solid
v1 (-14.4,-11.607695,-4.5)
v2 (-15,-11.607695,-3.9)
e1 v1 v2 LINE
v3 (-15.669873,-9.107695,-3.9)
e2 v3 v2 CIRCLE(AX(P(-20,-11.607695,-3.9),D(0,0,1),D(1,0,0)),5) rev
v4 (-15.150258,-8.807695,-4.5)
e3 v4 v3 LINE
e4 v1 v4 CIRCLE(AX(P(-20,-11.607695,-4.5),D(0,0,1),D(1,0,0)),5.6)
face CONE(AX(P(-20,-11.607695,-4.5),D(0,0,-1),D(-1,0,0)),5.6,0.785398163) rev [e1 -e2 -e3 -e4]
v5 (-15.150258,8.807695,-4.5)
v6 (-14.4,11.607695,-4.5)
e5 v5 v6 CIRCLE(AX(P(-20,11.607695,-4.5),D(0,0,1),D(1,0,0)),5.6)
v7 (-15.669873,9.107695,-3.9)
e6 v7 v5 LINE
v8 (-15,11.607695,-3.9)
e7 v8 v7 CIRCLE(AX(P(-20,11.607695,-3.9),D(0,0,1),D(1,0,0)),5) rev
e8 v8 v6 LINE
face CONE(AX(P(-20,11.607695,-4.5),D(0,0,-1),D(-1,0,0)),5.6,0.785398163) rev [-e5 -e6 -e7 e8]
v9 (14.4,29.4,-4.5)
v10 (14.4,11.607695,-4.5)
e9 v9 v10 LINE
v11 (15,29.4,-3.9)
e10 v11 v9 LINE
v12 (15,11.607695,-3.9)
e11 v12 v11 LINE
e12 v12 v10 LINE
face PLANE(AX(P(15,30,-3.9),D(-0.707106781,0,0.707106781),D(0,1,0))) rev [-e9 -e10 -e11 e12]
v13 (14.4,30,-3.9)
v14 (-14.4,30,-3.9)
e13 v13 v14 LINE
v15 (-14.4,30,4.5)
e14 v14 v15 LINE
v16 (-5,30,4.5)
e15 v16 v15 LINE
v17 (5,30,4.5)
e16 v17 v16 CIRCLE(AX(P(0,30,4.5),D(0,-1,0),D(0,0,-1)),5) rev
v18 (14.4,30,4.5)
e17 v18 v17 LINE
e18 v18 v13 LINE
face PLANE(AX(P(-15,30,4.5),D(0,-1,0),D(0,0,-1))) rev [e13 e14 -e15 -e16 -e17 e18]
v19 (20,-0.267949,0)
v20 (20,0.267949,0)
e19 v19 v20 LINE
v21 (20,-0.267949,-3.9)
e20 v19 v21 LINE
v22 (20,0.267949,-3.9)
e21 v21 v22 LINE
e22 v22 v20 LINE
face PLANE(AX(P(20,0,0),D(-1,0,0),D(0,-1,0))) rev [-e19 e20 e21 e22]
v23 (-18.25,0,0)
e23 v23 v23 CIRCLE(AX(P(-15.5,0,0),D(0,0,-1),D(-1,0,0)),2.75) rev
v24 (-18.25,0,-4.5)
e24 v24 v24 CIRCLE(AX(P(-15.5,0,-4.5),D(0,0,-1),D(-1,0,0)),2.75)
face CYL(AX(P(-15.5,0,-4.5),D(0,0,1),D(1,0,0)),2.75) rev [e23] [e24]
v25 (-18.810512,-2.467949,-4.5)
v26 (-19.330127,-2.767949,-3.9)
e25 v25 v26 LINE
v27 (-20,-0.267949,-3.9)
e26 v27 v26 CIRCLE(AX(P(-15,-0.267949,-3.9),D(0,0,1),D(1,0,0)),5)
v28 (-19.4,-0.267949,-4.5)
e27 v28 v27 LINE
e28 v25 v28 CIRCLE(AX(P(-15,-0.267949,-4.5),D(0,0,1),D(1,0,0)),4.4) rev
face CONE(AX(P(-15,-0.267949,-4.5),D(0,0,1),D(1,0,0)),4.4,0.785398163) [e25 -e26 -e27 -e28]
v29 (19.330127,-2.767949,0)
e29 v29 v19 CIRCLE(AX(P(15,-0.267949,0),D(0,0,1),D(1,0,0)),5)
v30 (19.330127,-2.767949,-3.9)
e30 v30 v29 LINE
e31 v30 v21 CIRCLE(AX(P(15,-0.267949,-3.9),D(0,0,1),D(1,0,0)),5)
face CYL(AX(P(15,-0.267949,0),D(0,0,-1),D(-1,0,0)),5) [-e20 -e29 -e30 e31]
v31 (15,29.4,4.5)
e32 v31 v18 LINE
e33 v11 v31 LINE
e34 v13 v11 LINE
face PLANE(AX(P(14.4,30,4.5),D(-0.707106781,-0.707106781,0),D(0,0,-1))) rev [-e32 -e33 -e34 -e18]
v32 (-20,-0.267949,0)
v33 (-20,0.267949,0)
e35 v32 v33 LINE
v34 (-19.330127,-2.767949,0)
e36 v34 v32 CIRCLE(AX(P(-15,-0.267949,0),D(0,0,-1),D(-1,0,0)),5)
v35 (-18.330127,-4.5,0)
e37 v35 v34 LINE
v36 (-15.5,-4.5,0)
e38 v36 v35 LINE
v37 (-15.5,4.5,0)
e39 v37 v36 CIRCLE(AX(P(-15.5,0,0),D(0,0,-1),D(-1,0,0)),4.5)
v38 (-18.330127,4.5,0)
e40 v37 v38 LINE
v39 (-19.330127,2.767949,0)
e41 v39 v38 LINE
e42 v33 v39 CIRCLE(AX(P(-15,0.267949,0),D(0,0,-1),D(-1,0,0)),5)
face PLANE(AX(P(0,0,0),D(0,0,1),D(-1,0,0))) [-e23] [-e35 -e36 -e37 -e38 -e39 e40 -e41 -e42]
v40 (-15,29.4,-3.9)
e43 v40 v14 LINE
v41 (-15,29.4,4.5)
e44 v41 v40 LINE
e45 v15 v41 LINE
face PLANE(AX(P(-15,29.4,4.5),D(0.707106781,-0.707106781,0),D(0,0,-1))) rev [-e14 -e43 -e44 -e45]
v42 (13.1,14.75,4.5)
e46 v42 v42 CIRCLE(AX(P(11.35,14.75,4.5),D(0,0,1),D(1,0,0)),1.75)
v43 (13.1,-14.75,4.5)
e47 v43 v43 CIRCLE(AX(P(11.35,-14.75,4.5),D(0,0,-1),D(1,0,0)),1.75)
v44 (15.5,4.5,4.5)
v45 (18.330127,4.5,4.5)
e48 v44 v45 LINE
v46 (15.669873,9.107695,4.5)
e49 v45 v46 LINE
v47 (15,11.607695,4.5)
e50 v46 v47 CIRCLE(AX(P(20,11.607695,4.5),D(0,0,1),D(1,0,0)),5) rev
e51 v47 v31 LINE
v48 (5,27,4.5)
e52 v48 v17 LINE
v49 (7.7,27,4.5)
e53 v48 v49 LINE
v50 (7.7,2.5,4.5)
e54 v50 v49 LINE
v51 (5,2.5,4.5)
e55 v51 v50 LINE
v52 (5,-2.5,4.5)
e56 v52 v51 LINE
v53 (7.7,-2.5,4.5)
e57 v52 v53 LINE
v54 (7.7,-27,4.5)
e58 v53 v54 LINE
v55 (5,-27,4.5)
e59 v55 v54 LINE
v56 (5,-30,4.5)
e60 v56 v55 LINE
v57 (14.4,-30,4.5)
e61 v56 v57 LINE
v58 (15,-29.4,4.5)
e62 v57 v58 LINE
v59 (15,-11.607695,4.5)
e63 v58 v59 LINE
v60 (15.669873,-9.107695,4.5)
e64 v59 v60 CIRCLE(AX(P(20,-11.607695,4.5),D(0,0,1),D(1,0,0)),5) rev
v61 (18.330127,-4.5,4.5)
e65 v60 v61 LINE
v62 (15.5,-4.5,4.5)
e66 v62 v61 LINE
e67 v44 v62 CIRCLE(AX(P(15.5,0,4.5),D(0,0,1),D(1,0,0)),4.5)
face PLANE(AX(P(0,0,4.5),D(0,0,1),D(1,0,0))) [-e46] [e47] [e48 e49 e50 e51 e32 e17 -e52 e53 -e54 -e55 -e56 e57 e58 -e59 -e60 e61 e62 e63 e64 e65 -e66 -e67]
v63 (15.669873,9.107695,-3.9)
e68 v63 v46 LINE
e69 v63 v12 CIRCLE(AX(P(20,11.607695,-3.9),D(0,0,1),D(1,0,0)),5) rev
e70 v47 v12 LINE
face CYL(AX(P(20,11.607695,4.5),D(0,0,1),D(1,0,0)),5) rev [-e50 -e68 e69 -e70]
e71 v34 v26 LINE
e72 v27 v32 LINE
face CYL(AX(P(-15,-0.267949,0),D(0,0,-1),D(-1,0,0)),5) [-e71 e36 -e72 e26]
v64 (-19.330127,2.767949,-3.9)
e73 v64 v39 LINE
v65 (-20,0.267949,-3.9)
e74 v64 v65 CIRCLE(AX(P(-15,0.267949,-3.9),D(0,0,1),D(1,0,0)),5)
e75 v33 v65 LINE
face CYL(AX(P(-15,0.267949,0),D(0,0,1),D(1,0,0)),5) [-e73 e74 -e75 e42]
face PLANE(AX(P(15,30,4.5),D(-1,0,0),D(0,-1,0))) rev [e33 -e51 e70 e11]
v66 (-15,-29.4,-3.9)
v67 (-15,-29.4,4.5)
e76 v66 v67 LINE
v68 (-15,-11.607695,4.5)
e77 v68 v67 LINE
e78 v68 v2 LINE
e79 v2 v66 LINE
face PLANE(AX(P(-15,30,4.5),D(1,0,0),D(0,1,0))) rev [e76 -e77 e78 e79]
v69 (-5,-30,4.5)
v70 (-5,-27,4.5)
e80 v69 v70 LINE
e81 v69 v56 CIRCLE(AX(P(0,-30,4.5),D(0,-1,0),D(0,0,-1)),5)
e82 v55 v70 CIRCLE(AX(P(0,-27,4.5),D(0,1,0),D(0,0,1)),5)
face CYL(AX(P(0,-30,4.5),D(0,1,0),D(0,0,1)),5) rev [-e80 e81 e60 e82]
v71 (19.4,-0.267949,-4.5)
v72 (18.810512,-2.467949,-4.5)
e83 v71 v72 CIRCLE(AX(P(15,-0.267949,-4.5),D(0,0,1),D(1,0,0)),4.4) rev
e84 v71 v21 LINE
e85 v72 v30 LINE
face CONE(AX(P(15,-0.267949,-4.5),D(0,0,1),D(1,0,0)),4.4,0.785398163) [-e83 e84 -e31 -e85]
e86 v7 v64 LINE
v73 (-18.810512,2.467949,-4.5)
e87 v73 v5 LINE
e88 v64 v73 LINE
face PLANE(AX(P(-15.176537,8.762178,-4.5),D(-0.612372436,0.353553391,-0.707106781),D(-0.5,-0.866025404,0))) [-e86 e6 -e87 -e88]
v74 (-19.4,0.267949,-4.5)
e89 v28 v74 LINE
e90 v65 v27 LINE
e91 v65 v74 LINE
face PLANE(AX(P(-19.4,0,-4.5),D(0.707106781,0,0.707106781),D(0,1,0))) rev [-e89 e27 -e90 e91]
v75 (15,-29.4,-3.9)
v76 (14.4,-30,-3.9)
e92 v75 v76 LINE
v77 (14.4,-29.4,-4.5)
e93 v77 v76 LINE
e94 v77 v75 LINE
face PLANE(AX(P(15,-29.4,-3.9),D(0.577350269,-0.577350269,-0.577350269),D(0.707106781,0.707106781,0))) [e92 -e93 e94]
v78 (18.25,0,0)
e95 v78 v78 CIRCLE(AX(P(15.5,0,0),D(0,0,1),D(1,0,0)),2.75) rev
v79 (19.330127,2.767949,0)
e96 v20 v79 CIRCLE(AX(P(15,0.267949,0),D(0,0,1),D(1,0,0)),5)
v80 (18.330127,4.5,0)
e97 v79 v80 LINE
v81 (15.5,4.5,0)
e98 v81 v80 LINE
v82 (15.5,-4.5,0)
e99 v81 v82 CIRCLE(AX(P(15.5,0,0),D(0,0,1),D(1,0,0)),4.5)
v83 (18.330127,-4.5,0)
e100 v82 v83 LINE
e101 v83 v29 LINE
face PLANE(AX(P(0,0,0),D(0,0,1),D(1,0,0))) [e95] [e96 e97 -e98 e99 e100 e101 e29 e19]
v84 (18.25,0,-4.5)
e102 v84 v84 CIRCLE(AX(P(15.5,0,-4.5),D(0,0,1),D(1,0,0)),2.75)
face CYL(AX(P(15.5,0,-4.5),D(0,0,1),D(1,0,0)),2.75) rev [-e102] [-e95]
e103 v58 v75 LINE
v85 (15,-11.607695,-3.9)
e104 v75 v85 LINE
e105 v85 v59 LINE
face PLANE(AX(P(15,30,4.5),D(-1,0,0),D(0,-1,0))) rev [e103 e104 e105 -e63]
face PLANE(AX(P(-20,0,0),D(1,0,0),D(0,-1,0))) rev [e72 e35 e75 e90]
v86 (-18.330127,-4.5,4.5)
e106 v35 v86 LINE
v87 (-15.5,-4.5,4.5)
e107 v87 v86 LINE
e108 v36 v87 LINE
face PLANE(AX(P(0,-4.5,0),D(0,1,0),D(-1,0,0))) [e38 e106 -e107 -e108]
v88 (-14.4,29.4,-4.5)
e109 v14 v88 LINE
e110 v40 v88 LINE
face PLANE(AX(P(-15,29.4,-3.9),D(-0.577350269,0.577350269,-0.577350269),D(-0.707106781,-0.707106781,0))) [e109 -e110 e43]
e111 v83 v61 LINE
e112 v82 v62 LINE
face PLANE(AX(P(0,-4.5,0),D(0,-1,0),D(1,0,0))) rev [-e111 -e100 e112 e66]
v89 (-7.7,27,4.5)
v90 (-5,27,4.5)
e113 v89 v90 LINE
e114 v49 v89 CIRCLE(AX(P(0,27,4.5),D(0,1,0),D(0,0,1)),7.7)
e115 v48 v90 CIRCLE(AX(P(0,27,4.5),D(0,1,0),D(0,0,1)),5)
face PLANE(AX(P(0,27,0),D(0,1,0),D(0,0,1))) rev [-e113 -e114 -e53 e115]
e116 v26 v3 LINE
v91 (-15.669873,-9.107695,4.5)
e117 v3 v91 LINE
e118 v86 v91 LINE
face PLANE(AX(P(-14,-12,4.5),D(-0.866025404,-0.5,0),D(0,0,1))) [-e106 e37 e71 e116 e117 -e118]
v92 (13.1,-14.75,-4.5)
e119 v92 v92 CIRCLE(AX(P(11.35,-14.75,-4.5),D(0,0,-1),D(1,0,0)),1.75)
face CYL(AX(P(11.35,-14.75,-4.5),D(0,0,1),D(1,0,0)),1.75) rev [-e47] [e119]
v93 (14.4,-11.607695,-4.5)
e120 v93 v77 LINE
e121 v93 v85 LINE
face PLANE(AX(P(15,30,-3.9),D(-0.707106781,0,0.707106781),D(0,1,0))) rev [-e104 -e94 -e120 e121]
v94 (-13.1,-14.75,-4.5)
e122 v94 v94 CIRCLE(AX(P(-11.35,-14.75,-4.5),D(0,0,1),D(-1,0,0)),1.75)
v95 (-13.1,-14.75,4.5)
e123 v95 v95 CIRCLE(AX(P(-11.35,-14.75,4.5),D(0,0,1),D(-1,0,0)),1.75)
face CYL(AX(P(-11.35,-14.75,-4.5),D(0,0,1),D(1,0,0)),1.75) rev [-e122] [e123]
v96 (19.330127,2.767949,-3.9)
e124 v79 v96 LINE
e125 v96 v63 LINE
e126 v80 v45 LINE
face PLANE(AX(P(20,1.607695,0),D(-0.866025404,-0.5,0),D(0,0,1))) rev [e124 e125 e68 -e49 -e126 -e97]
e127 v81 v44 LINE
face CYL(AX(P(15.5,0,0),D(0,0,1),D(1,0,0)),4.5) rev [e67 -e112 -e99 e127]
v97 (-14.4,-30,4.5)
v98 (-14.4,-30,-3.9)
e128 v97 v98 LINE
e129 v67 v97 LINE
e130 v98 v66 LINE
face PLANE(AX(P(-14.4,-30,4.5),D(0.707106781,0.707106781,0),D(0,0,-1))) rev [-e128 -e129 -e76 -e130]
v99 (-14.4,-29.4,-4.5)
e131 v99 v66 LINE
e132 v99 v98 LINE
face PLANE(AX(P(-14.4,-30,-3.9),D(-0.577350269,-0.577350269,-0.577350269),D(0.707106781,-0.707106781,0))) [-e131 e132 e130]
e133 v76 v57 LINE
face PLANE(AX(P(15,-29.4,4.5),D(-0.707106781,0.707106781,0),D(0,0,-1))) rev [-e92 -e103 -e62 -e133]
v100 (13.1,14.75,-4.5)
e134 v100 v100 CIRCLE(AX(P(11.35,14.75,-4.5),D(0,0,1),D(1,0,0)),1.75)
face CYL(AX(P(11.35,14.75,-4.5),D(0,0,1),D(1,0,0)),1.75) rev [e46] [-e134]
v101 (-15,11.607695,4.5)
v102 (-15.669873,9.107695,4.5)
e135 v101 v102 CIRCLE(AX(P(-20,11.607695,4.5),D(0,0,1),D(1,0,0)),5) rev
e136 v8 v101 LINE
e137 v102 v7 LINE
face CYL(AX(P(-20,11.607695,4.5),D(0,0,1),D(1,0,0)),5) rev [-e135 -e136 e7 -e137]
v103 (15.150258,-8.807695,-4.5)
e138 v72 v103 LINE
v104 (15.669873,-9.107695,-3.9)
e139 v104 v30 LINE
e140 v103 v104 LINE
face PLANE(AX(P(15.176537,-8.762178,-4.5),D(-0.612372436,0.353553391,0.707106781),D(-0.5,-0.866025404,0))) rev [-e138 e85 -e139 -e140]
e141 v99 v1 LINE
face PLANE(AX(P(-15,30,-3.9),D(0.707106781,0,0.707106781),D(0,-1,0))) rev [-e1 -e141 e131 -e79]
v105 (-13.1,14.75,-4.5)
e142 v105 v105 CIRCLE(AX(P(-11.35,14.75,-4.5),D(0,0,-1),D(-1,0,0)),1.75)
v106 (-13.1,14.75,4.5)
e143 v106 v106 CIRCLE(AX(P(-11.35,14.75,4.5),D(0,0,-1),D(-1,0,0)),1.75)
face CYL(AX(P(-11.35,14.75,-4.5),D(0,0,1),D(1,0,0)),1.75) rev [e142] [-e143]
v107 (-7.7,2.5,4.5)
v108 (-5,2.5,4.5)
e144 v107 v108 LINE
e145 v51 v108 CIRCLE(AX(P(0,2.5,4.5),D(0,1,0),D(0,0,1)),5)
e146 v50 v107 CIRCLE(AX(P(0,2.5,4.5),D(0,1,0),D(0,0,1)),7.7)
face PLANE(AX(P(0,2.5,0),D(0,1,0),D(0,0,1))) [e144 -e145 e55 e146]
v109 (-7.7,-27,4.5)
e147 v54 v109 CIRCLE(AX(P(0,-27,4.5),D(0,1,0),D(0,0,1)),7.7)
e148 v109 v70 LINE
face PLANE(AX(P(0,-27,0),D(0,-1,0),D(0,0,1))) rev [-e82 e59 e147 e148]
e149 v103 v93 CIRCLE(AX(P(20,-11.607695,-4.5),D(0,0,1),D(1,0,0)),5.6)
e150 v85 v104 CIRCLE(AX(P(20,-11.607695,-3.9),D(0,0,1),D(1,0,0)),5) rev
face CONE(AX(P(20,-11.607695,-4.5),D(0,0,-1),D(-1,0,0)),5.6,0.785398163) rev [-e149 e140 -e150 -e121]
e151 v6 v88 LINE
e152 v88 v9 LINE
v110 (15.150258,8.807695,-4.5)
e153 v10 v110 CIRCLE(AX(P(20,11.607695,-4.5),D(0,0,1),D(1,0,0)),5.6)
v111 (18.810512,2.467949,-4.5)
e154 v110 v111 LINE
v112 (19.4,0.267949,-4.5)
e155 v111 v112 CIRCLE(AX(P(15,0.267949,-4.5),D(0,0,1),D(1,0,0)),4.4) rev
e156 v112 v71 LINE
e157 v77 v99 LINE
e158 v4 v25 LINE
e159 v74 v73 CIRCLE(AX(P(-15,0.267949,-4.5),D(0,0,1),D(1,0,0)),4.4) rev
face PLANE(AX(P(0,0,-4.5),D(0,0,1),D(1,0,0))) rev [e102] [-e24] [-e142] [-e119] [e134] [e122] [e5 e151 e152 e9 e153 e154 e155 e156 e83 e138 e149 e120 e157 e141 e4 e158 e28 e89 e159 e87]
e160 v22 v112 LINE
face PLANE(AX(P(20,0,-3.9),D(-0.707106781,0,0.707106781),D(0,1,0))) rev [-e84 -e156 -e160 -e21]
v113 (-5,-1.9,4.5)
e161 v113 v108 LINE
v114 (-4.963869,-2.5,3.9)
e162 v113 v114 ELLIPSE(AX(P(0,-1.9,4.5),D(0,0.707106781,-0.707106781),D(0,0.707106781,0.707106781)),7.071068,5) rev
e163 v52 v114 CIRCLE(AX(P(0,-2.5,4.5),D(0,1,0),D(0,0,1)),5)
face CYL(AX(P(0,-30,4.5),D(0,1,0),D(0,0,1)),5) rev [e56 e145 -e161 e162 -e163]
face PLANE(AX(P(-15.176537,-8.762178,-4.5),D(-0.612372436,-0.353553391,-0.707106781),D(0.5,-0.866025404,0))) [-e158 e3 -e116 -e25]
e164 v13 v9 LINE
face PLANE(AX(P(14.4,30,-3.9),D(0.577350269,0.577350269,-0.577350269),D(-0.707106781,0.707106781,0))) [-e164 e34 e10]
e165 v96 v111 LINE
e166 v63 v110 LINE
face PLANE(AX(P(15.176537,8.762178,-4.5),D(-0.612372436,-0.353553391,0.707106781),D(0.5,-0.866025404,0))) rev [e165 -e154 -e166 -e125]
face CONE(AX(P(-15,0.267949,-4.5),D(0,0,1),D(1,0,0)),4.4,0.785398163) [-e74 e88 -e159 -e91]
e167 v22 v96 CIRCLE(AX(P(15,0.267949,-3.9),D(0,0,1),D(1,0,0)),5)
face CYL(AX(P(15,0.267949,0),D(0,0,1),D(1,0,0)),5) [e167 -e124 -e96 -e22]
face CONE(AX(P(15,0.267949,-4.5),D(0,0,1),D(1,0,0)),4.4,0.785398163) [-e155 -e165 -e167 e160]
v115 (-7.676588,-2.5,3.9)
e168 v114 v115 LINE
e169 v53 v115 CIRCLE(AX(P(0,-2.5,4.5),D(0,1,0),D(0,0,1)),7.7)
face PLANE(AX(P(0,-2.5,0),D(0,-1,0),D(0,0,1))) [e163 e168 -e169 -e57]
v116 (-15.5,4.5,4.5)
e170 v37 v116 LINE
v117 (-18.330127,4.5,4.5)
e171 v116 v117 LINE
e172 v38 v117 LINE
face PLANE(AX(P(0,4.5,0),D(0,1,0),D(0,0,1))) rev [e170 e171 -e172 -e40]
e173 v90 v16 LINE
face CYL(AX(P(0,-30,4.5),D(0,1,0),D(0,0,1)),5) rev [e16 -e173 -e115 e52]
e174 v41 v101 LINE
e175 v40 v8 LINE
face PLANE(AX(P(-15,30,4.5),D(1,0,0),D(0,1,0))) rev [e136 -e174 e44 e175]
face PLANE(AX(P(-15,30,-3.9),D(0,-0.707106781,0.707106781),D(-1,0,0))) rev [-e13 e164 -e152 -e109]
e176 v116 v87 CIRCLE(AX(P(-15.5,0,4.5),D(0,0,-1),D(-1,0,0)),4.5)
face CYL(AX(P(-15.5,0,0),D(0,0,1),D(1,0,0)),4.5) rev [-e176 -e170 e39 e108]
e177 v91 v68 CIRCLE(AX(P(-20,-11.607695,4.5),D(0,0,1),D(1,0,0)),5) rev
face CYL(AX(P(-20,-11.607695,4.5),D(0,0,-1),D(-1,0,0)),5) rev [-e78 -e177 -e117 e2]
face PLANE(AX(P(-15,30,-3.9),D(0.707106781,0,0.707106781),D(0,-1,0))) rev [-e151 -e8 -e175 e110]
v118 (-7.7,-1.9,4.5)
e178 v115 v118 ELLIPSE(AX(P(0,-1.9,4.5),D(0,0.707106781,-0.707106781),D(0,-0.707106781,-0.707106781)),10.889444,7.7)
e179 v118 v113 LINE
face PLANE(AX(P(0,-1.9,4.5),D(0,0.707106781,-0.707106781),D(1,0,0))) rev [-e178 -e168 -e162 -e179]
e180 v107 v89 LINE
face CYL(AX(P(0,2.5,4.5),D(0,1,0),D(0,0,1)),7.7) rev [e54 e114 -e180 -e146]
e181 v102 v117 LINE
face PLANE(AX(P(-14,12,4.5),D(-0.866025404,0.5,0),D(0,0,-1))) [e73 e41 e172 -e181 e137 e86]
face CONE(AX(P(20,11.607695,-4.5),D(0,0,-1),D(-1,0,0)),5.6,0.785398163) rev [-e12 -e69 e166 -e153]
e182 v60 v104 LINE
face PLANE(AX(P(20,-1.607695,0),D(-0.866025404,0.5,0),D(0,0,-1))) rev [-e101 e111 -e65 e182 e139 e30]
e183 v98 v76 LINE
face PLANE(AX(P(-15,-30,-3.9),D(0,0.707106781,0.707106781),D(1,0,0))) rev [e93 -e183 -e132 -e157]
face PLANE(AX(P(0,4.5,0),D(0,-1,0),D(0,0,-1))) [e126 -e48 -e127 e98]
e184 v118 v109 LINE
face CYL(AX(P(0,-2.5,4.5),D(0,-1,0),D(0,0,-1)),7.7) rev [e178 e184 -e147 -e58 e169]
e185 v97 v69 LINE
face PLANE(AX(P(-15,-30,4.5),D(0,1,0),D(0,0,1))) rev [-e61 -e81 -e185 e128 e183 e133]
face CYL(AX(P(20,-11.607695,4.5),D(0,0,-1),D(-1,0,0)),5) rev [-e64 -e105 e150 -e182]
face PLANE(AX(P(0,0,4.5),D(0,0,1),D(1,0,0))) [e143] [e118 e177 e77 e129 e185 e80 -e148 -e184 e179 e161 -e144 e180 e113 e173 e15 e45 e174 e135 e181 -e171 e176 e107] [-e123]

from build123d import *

# Parameters (mm, degrees)
ESBO_O1_W                    = 30
ESBO_O1_H                    = 60
RESSALTO_EXTRUS_O1_DEPTH     = 4.5
CORTE_EXTRUS_O2_DEPTH        = 63.010079826
CORTE_EXTRUS_O3_START        = -24.5
CORTE_EXTRUS_O3_DEPTH        = 24.5
ESBO_O4_W                    = 9
ESBO_O4_H                    = 24
RESSALTO_EXTRUS_O3_DEPTH     = 5
CHANFRO1_SIZE                = 6
CHANFRO1_SIZE_2              = 10.392304845
FILETE2_R                    = 5
CHANFRO1_OF_ESPELHAR2_SIZE   = 6
CHANFRO1_OF_ESPELHAR2_SIZE_2 = 10.392304845
FILETE3_R                    = 5
ESBO_O5_R                    = 2.75
CORTE_EXTRUS_O4_DEPTH        = 38.161808352
ESBO_O6_R                    = 4.5
ESBO_O6_R_2                  = 2.75
CORTE_EXTRUS_O5_DEPTH        = 4.5
ESBO_O7_R                    = 1.75
CORTE_EXTRUS_O6_DEPTH        = 38.161808352
ESPELHAR4_COPY_1_SKETCH_R    = 1.75
ESPELHAR4_COPY_1_DEPTH       = 38.161808352
CHANFRO2_SIZE                = 0.6


with BuildPart() as part:
    # Esboço1 → Ressalto-extrusão1 (new, symmetric)
    with BuildSketch(Plane.XY):
        Rectangle(ESBO_O1_W, ESBO_O1_H)
    extrude(amount=RESSALTO_EXTRUS_O1_DEPTH, both=True)

    # Esboço2 → Corte-extrusão2 (cut, through all)
    with BuildSketch(Plane.XZ.offset(30)):
        with BuildLine():
            Line((-5, 58.363424399), (-5, 4.5))
            ThreePointArc((-5, 4.5), (0, -0.5), (5, 4.5))
            Line((5, 4.5), (5, 58.363424399))
            Line((5, 58.363424399), (5, 166.090273197))
            Line((5, 166.090273197), (-5, 166.090273197))
            Line((-5, 166.090273197), (-5, 58.363424399))
        make_face()
    extrude(amount=-CORTE_EXTRUS_O2_DEPTH, mode=Mode.SUBTRACT)

    # Esboço3 → Corte-extrusão3 (cut)
    with BuildSketch(Plane(origin=(0, 27, 0), x_dir=(1, 0, 0), z_dir=(0, 1, 0)).offset(CORTE_EXTRUS_O3_START)):
        with BuildLine():
            ThreePointArc((-5, -4.5), (0, 0.5), (5, -4.5))
            Line((5, -4.5), (7.7, -4.5))
            ThreePointArc((7.7, -4.5), (0, 3.2), (-7.7, -4.5))
            Line((-7.7, -4.5), (-5, -4.5))
        make_face()
    corte_extrus_o3 = extrude(amount=CORTE_EXTRUS_O3_DEPTH, mode=Mode.SUBTRACT)

    # Espelhar1: Corte-extrusão3 across plane
    add(corte_extrus_o3.mirror(Plane.ZX), mode=Mode.SUBTRACT)

    # Esboço4 → Ressalto-extrusão3 (add)
    with BuildSketch(Plane(origin=(15, 0, 0), x_dir=(0, 0, -1), z_dir=(1, 0, 0))):
        Rectangle(ESBO_O4_W, ESBO_O4_H)
    ressalto_extrus_o3 = extrude(amount=RESSALTO_EXTRUS_O3_DEPTH)

    # Chanfro1
    # the kernel refuses this chamfer: 10.392304845, 6 mm, written as the material it takes off along each edge
    with BuildSketch(Plane(origin=(20, 12, -31.385783824), x_dir=(-0.9983227437537926, 0.05789386240267147, 0), z_dir=(0, 0, 1))) as chanfro1_piece_1_section:
        Polygon((CHANFRO1_SIZE * 0.998322743754, CHANFRO1_SIZE * 0.0578938624027), (-CHANFRO1_SIZE_2 * 0.057893862405, CHANFRO1_SIZE_2 * 0.998322743793), (0, 0), align=None)
    chanfro1_piece_1 = extrude(amount=62.771567647, mode=Mode.PRIVATE)
    chanfro1_piece_1 = split(chanfro1_piece_1, bisect_by=Plane(origin=(15, 8.382110688, 0), z_dir=(1, 0, 0)), keep=Keep.TOP, mode=Mode.PRIVATE)
    add(chanfro1_piece_1, mode=Mode.SUBTRACT)
    with BuildSketch(Plane(origin=(20, -12, 31.385783824), x_dir=(-0.9983227437537926, -0.05789386240267147, 0), z_dir=(0, 0, -1))) as chanfro1_piece_2_section:
        Polygon((CHANFRO1_SIZE * 0.998322743754, CHANFRO1_SIZE * 0.0578938624027), (-CHANFRO1_SIZE_2 * 0.057893862405, CHANFRO1_SIZE_2 * 0.998322743793), (0, 0), align=None)
    chanfro1_piece_2 = extrude(amount=62.771567647, mode=Mode.PRIVATE)
    chanfro1_piece_2 = split(chanfro1_piece_2, bisect_by=Plane(origin=(15, -8.382110688, 0), z_dir=(1, 0, 0)), keep=Keep.TOP, mode=Mode.PRIVATE)
    add(chanfro1_piece_2, mode=Mode.SUBTRACT)

    # Filete2
    filete2_edges = [part.edges().sort_by_distance(p)[0] for p in [
        (20, -1.607695155, 0),
        (20, 1.607695155, 0),
        (15, 10.267949192, 0),
        (15, -10.267949192, 0),
    ]]
    fillet(filete2_edges, radius=FILETE2_R)

    # Espelhar2: Ressalto-extrusão3 across plane
    add(ressalto_extrus_o3.mirror(Plane(origin=(0, 0, 0), x_dir=(0, 0, 1), z_dir=(1, 0, 0))))

    # Chanfro1 of Espelhar2
    # the kernel refuses this chamfer: 10.392304845, 6 mm, written as the material it takes off along each edge
    with BuildSketch(Plane(origin=(-20, 12, -31.385783824), x_dir=(0.9983227437537926, 0.05789386240267147, 0), z_dir=(0, 0, 1))) as chanfro1_of_espelhar2_piece_1_section:
        Polygon((CHANFRO1_OF_ESPELHAR2_SIZE * 0.998322743754, -CHANFRO1_OF_ESPELHAR2_SIZE * 0.0578938624027), (-CHANFRO1_OF_ESPELHAR2_SIZE_2 * 0.057893862405, -CHANFRO1_OF_ESPELHAR2_SIZE_2 * 0.998322743793), (0, 0), align=None)
    chanfro1_of_espelhar2_piece_1 = extrude(amount=62.771567647, mode=Mode.PRIVATE)
    chanfro1_of_espelhar2_piece_1 = split(chanfro1_of_espelhar2_piece_1, bisect_by=Plane(origin=(-15, 8.382110688, 0), z_dir=(-1, 0, 0)), keep=Keep.TOP, mode=Mode.PRIVATE)
    add(chanfro1_of_espelhar2_piece_1, mode=Mode.SUBTRACT)
    with BuildSketch(Plane(origin=(-20, -12, 31.385783824), x_dir=(0.9983227437537926, -0.05789386240267147, 0), z_dir=(0, 0, -1))) as chanfro1_of_espelhar2_piece_2_section:
        Polygon((CHANFRO1_OF_ESPELHAR2_SIZE * 0.998322743754, -CHANFRO1_OF_ESPELHAR2_SIZE * 0.0578938624027), (-CHANFRO1_OF_ESPELHAR2_SIZE_2 * 0.057893862405, -CHANFRO1_OF_ESPELHAR2_SIZE_2 * 0.998322743793), (0, 0), align=None)
    chanfro1_of_espelhar2_piece_2 = extrude(amount=62.771567647, mode=Mode.PRIVATE)
    chanfro1_of_espelhar2_piece_2 = split(chanfro1_of_espelhar2_piece_2, bisect_by=Plane(origin=(-15, -8.382110688, 0), z_dir=(-1, 0, 0)), keep=Keep.TOP, mode=Mode.PRIVATE)
    add(chanfro1_of_espelhar2_piece_2, mode=Mode.SUBTRACT)

    # Filete3
    filete3_edges = [part.edges().sort_by_distance(p)[0] for p in [
        (-20, -1.607695155, 0),
        (-20, 1.607695155, 0),
        (-15, 10.267949192, 0),
        (-15, -10.267949192, 0),
    ]]
    fillet(filete3_edges, radius=FILETE3_R)

    # Esboço5 → Corte-extrusão4 (cut, through all)
    with BuildSketch(Plane.XY.offset(4.5)):
        with Locations((15.5, 0)):
            Circle(ESBO_O5_R)
    corte_extrus_o4 = extrude(amount=-CORTE_EXTRUS_O4_DEPTH, mode=Mode.SUBTRACT)

    # Esboço6 → Corte-extrusão5 (cut)
    # profile 1 of 3: a face of its own
    with BuildSketch(Plane.XY.offset(4.5)):
        with BuildLine():
            Line((18.330127019, 4.5), (15.5, 4.5))
            ThreePointArc((15.5, 4.5), (18.681980515, 3.181980515), (20, 0))
            Line((20, 0), (20, 0.267949192))
            ThreePointArc((20, 0.267949192), (19.829629131, 1.562044418), (19.330127019, 2.767949192))
            Line((19.330127019, 2.767949192), (18.330127019, 4.5))
        make_face()
    # profile 2 of 3: a face of its own
    with BuildSketch(Plane.XY.offset(4.5)):
        with Locations((15.5, 0)):
            Circle(ESBO_O6_R)
        with Locations((15.5, 0)):
            Circle(ESBO_O6_R_2, mode=Mode.SUBTRACT)
    # profile 3 of 3: a face of its own
    with BuildSketch(Plane.XY.offset(4.5)):
        with BuildLine():
            Line((20, -0.267949192), (20, 0))
            ThreePointArc((20, 0), (18.681980515, -3.181980515), (15.5, -4.5))
            Line((15.5, -4.5), (18.330127019, -4.5))
            Line((18.330127019, -4.5), (19.330127019, -2.767949192))
            ThreePointArc((19.330127019, -2.767949192), (19.829629131, -1.562044418), (20, -0.267949192))
        make_face()
    corte_extrus_o5 = extrude(amount=-CORTE_EXTRUS_O5_DEPTH, mode=Mode.SUBTRACT)

    # Espelhar5: Corte-extrusão4, Corte-extrusão5 across plane
    add(corte_extrus_o4.mirror(Plane(origin=(0, 0, 0), x_dir=(0, 0, 1), z_dir=(1, 0, 0))), mode=Mode.SUBTRACT)
    add(corte_extrus_o5.mirror(Plane(origin=(0, 0, 0), x_dir=(0, 0, 1), z_dir=(1, 0, 0))), mode=Mode.SUBTRACT)

    # Esboço7 → Corte-extrusão6 (cut, through all)
    with BuildSketch(Plane.XY.offset(4.5)):
        with Locations((11.35, 14.75)):
            Circle(ESBO_O7_R)
    corte_extrus_o6 = extrude(amount=-CORTE_EXTRUS_O6_DEPTH, mode=Mode.SUBTRACT)

    # Espelhar3: Corte-extrusão6 across plane
    add(corte_extrus_o6.mirror(Plane.ZX), mode=Mode.SUBTRACT)

    # Espelhar4: Corte-extrusão6 across plane
    add(corte_extrus_o6.mirror(Plane(origin=(0, 0, 0), x_dir=(0, 0, 1), z_dir=(1, 0, 0))), mode=Mode.SUBTRACT)

    # Espelhar4 copy 1 sketch → Espelhar4 copy 1 (cut, through all)
    with BuildSketch(Plane(origin=(0, 0, 4.5), x_dir=(-1, 0, 0), z_dir=(0, 0, 1))):
        with Locations((11.35, 14.75)):
            Circle(ESPELHAR4_COPY_1_SKETCH_R)
    extrude(amount=-ESPELHAR4_COPY_1_DEPTH, mode=Mode.SUBTRACT)

    # Chanfro2
    chanfro2_edges = [part.edges().sort_by_distance(p)[0] for p in [
        (17.5, 5.937822174, -4.5),
        (17.5, -5.937822174, -4.5),
        (20, 0, -4.5),
        (19.829629131, -1.562044418, -4.5),
        (19.829629131, 1.562044418, -4.5),
        (15.170370869, 10.313599929, -4.5),
        (15.170370869, -10.313599929, -4.5),
        (-15, -20.803847577, -4.5),
        (-17.5, -5.937822174, -4.5),
        (-17.5, 5.937822174, -4.5),
        (-20, 0, -4.5),
        (-19.829629131, -1.562044418, -4.5),
        (-19.829629131, 1.562044418, -4.5),
        (-15.170370869, -10.313599929, -4.5),
        (-15.170370869, 10.313599929, -4.5),
        (-6.35, -2.5, 4.5),
        (0, -30, -4.5),
        (-15, 20.803847577, -4.5),
        (0, 30, -4.5),
        (15, -20.803847577, -4.5),
        (15, -30, 0),
        (-15, -30, 0),
        (-15, 30, 0),
        (15, 30, 0),
        (15, 20.803847577, -4.5),
    ]]
    chamfer(chanfro2_edges, length=CHANFRO2_SIZE)


solid = part.part
